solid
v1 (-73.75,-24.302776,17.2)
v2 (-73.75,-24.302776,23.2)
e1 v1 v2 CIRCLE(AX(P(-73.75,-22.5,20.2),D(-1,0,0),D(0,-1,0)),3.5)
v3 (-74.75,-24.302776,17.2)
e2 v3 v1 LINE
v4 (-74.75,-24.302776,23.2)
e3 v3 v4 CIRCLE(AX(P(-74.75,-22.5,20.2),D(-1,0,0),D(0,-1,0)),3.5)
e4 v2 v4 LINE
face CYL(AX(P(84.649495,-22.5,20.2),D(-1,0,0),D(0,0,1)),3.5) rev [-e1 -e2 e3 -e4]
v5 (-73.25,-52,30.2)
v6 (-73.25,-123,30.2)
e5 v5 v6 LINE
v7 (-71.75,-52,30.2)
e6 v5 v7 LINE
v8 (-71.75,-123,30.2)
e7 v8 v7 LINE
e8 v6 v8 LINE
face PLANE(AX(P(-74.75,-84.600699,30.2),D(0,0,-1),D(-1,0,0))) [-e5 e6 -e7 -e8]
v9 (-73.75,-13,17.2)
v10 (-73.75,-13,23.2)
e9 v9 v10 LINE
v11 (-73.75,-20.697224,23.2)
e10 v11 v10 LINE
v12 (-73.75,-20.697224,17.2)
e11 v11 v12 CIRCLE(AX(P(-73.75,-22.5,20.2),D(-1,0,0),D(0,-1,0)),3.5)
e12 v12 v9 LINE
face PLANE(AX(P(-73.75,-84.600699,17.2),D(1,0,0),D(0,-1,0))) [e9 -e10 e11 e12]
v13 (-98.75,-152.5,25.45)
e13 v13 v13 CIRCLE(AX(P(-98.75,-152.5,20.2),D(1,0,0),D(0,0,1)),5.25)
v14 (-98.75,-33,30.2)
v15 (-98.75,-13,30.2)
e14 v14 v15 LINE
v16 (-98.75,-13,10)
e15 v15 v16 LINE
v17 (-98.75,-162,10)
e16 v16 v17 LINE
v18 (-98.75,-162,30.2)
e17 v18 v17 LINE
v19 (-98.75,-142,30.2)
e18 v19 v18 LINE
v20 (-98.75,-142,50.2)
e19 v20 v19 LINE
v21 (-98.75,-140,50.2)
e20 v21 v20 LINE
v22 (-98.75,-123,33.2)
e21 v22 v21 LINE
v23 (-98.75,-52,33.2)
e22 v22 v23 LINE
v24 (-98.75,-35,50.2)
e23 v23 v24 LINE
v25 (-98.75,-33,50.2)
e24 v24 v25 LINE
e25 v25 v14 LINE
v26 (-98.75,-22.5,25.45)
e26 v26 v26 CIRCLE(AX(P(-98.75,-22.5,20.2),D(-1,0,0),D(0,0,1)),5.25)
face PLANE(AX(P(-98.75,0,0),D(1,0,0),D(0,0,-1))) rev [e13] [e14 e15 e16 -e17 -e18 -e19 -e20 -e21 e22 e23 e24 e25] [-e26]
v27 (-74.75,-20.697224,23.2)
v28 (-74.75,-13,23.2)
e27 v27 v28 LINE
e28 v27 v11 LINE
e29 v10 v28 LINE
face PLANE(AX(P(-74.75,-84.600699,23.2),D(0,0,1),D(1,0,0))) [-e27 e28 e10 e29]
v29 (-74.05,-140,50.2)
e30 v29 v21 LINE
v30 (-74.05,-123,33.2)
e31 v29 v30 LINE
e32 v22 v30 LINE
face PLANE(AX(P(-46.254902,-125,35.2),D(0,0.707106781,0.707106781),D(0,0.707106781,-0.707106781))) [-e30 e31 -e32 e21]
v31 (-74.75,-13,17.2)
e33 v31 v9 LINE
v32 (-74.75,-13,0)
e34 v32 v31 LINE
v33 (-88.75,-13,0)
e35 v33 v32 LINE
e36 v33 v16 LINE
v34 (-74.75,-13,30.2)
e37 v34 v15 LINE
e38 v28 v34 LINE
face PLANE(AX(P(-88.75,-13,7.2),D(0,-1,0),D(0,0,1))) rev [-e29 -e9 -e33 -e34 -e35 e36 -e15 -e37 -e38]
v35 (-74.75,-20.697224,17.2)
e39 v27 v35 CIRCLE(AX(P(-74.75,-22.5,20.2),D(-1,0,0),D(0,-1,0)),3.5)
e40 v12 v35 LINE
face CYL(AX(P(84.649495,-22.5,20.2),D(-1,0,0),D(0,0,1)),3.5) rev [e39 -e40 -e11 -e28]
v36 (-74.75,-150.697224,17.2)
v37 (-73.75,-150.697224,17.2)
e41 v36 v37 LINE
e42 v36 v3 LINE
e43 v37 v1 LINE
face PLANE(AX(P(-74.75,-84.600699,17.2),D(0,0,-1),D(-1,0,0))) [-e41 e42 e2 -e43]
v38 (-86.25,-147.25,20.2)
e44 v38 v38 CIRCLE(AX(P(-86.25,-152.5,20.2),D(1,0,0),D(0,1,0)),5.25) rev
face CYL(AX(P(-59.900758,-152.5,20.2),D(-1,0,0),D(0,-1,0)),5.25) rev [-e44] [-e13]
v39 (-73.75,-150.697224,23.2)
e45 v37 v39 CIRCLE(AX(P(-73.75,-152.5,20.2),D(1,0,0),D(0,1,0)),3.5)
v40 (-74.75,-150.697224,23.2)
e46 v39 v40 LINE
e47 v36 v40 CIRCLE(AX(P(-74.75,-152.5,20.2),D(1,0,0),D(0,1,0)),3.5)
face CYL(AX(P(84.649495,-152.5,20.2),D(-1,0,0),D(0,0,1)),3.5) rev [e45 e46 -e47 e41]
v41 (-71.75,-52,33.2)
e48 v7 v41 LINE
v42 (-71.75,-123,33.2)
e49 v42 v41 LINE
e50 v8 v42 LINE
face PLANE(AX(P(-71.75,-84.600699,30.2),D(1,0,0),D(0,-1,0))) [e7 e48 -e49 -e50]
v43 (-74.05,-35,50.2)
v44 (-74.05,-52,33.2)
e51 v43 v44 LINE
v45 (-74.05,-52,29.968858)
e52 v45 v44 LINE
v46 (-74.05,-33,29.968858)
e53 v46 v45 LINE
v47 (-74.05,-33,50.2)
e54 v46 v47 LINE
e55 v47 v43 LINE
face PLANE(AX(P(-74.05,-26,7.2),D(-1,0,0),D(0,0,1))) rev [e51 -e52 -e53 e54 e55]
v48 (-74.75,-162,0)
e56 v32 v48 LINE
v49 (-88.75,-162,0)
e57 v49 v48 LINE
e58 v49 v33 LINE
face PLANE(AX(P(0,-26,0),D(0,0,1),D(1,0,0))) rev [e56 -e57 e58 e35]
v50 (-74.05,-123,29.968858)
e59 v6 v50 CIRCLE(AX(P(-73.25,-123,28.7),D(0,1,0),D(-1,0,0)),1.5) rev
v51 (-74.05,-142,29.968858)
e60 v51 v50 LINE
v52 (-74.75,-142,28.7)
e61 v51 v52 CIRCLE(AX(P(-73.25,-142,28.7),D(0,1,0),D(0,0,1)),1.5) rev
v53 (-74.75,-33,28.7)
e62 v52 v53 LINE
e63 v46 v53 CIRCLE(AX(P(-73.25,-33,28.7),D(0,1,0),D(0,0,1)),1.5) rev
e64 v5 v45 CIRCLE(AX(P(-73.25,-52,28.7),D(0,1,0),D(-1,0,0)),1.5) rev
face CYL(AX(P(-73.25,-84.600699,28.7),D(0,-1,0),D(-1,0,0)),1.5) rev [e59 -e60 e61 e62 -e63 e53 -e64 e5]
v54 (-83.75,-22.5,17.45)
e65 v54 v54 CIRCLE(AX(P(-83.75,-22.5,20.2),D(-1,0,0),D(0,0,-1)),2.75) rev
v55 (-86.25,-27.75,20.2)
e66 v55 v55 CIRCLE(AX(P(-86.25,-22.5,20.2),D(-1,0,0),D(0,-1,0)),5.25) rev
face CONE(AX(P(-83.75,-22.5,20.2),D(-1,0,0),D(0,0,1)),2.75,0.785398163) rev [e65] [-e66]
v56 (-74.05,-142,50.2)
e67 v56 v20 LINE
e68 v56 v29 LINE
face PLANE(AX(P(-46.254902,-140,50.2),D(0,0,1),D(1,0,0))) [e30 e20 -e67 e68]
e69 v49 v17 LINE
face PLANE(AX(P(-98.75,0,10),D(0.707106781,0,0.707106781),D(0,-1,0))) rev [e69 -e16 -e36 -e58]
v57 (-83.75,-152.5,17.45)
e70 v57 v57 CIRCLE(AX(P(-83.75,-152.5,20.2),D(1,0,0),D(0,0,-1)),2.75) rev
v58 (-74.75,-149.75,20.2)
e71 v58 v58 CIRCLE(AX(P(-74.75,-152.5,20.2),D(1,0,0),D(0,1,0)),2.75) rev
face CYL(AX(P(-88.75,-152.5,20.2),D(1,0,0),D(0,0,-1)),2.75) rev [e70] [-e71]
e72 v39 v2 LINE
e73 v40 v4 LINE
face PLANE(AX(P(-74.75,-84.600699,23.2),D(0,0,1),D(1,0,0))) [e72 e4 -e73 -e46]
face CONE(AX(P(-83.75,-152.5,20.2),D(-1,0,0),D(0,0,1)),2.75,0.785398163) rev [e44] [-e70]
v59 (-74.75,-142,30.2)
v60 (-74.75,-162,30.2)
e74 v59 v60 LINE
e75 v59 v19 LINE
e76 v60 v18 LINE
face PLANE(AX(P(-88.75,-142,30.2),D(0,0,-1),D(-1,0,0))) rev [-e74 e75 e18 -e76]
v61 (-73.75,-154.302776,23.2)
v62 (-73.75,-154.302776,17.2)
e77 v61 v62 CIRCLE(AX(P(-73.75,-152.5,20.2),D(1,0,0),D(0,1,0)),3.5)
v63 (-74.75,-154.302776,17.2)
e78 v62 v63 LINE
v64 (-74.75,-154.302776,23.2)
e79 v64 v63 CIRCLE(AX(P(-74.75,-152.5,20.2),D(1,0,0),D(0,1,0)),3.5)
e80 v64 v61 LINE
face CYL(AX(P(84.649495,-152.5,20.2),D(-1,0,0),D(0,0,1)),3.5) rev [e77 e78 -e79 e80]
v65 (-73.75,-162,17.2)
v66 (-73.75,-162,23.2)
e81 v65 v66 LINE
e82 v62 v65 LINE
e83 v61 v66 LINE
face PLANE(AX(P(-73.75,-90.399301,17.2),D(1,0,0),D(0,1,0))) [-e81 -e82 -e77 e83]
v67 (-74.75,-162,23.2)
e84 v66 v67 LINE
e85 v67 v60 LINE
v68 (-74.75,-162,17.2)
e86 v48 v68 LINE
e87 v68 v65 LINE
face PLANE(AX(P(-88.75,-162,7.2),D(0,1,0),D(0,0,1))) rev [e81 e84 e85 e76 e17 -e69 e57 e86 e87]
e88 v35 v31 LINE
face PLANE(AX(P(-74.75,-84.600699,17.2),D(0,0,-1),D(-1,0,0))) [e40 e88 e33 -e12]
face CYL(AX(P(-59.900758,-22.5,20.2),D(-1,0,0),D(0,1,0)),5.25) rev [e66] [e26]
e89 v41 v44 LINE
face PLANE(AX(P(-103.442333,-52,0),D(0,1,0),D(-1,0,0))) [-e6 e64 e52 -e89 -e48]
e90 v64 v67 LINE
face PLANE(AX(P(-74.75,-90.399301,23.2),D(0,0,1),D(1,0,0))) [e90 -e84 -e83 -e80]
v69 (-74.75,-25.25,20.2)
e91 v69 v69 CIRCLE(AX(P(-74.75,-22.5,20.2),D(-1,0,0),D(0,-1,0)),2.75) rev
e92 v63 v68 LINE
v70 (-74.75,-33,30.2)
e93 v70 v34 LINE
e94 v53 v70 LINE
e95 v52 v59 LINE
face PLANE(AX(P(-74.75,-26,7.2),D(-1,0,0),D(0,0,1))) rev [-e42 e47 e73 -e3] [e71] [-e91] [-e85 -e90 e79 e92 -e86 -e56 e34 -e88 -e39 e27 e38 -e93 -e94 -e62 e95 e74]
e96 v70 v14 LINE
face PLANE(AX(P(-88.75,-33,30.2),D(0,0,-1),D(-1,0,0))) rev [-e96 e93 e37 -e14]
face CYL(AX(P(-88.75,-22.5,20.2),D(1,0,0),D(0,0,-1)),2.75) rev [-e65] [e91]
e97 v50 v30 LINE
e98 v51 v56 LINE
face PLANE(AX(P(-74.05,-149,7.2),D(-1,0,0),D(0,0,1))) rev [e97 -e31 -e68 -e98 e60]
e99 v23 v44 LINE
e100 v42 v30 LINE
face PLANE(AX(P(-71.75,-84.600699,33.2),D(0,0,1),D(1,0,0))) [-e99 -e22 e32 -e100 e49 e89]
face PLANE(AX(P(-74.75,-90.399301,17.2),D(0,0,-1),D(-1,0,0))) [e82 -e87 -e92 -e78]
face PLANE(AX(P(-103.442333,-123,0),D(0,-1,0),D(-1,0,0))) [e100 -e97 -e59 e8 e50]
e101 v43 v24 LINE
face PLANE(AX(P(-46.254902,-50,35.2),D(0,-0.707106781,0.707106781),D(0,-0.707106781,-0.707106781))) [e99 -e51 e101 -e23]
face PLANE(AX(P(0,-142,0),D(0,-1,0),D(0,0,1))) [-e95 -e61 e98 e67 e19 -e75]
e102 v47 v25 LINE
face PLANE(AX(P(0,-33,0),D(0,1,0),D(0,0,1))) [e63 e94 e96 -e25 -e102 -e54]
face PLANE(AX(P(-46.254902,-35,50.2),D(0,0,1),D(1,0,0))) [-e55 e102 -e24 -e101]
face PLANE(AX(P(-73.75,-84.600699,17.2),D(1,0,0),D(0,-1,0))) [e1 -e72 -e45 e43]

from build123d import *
from build123d.topology import SkipClean

# Parameters (mm, degrees)
BOSS_EXTRUDE1_DEPTH            = 7.2
SKETCH2_R                      = 1.1
CUT_EXTRUDE1_DEPTH             = 99.880748885
SKETCH3_R                      = 2.25
CUT_EXTRUDE2_DEPTH             = 5.5
BOSS_EXTRUDE2_DEPTH            = 3
FILLET1_R                      = 11
BOSS_EXTRUDE3_DEPTH            = 43
BOSS_EXTRUDE4_DEPTH            = 30
FILLET2_R                      = 1.5
SKETCH7_R                      = 2.75
CUT_EXTRUDE3_DEPTH             = 179.693144804
SKETCH8_R                      = 5.25
CUT_EXTRUDE4_DEPTH             = 5
CUT_EXTRUDE6_START             = -2.5
SKETCH10_R                     = 5.25
CUT_EXTRUDE6_DEPTH             = 2.5
CHAMFER1_SIZE                  = 2.5
CUT_EXTRUDE5_REACH             = 170.548
SKETCH9_R                      = 3.5
CUT_EXTRUDE5_DIRECTION_2_REACH = 170.548
CUT_EXTRUDE7_DEPTH             = 105.056727317
CUT_EXTRUDE8_DEPTH             = 20
BOSS_EXTRUDE6_DEPTH            = 17
SKETCH15_R                     = 5.25
BOSS_EXTRUDE7_DEPTH            = 10
CHAMFER3_SIZE                  = 10
BOSS_EXTRUDE5_DEPTH            = 17.55
SKETCH16_W                     = 1.5
SKETCH16_H                     = 19
CUT_EXTRUDE9_DEPTH             = 2.3
BOSS_EXTRUDE8_DEPTH            = 4
BOSS_EXTRUDE9_DEPTH            = 31.5


with BuildPart() as part:
    # Sketch1 → Boss-Extrude1 (new body)
    with BuildSketch(Plane.XY):
        Polygon((74.75, 0), (-74.75, 0), (-74.75, 30), (-88.75, 30), (-88.75, -13), (84.25, -13), (84.25, 17), (74.75, 17), align=None)
    extrude(amount=BOSS_EXTRUDE1_DEPTH)

    # Sketch2 → Cut-Extrude1 (cut, through all)
    with BuildSketch(Plane.XZ.offset(13)):
        with Locations(Location((-56.25, 4.5, 0), (0, 0, 270))):
            Circle(SKETCH2_R)
        with Locations(Location((37.75, 4.5, 0), (0, 0, 270))):
            Circle(SKETCH2_R)
    extrude(amount=-CUT_EXTRUDE1_DEPTH, mode=Mode.SUBTRACT)

    # Sketch3 → Cut-Extrude2 (cut)
    with BuildSketch(Plane.XZ.offset(13)):
        with Locations(Location((-56.25, 4.5, 0), (0, 0, 270))):
            Circle(SKETCH3_R)
        with Locations(Location((37.75, 4.5, 0), (0, 0, 270))):
            Circle(SKETCH3_R)
    extrude(amount=-CUT_EXTRUDE2_DEPTH, mode=Mode.SUBTRACT)

    # Sketch4 → Boss-Extrude2 (add)
    with BuildSketch(Plane.XY.offset(7.2)):
        Polygon((-88.75, -13), (84.25, -13), (84.25, 2.989373151), (84.25, 17), (74.75, 17), (74.75, 6), (-74.75, 6), (-74.75, 30), (-88.75, 30), align=None)
    extrude(amount=BOSS_EXTRUDE2_DEPTH)

    # Fillet1
    fillet1_edges = [part.edges().sort_by_distance(p)[0] for p in [
        (74.75, 6, 8.7),
        (-74.75, 6, 8.7),
    ]]
    fillet(fillet1_edges, radius=FILLET1_R - 0.0001)  # a hair under: the kernel refuses the full size

    # Sketch5 → Boss-Extrude3 (add)
    with BuildSketch(Plane.XZ.offset(13)):
        Polygon((-74.75, 30.2), (-71.75, 30.2), (-71.75, 33.2), (-88.75, 33.2), (-88.75, 10.2), (-74.75, 10.2), (-74.75, 17.2), (-73.75, 17.2), (-73.75, 23.2), (-74.75, 23.2), align=None)
    extrude(amount=-BOSS_EXTRUDE3_DEPTH)

    # Sketch6 → Boss-Extrude4 (add)
    with BuildSketch(Plane.XZ.offset(13)):
        Polygon((74.75, 10.2), (74.75, 17.2), (73.75, 17.2), (73.75, 23.2), (74.75, 23.2), (74.75, 30.2), (71.75, 30.2), (71.75, 33.2), (84.25, 33.2), (84.25, 10.2), align=None)
    extrude(amount=-BOSS_EXTRUDE4_DEPTH)

    # Fillet2
    fillet2_edges = [part.edges().sort_by_distance(p)[0] for p in [
        (74.75, 1.99995, 10.2),
        (74.75, 2, 30.2),
        (-74.75, 1.99995, 10.2),
        (-74.75, 8.5, 30.2),
    ]]
    fillet(fillet2_edges, radius=FILLET2_R)

    # Sketch7 → Cut-Extrude3 (cut, through all)
    with BuildSketch(Plane(origin=(84.25, 0, 0), x_dir=(0, 0, -1), z_dir=(1, 0, 0))):
        with Locations((-20.2, -3.5)):
            Circle(SKETCH7_R)
    extrude(amount=-CUT_EXTRUDE3_DEPTH, mode=Mode.SUBTRACT)

    # Sketch8 → Cut-Extrude4 (cut)
    with BuildSketch(Plane(origin=(84.25, 0, 0), x_dir=(0, 0, -1), z_dir=(1, 0, 0))):
        with Locations((-20.2, -3.5)):
            Circle(SKETCH8_R)
    extrude(amount=-CUT_EXTRUDE4_DEPTH, mode=Mode.SUBTRACT)

    # Sketch10 → Cut-Extrude6 (cut)
    with BuildSketch(Plane.ZY.offset(88.75).offset(CUT_EXTRUDE6_START)):
        with Locations(Location((20.2, -3.5, 0), (0, 0, 180))):
            Circle(SKETCH10_R)
    extrude(amount=CUT_EXTRUDE6_DEPTH, mode=Mode.SUBTRACT)

    # Chamfer1
    chamfer1_edges = [part.edges().sort_by_distance(p)[0] for p in [
        (79.25, -3.5, 22.95),
        (-86.25, -3.5, 22.95),
    ]]
    chamfer(chamfer1_edges, length=CHAMFER1_SIZE - 0.0001)  # a hair under: the kernel refuses the full size

    # Cut-Extrude5: up to this face of the body (flat: up to its plane)
    cut_extrude5_end = Plane(part.part.faces().sort_by_distance((74.75, 2, 25.95))[0])
    # Sketch9 → Cut-Extrude5 (cut, up to the picked face)
    with BuildSketch(Plane.ZY.offset(-73.75), mode=Mode.PRIVATE) as cut_extrude5_sk1:
        with Locations((20.2, -3.5)):
            Circle(SKETCH9_R)
    cut_extrude5_tool1 = split(extrude(cut_extrude5_sk1.sketch, amount=-CUT_EXTRUDE5_REACH, mode=Mode.PRIVATE), bisect_by=cut_extrude5_end, keep=Keep.BOTH, mode=Mode.PRIVATE)
    add(cut_extrude5_tool1.solids().sort_by(Axis((73.75, -3.5, 20.2), (1, 0, 0)))[0], mode=Mode.SUBTRACT)

    # Cut-Extrude5 direction 2: up to this face of the body (flat: up to its plane)
    cut_extrude5_direction_2_end = Plane(part.part.faces().sort_by_distance((-74.75, 8.5, 25.95))[0])
    # Sketch9 → Cut-Extrude5 direction 2 (cut, up to the picked face)
    with BuildSketch(Plane.ZY.offset(-73.75), mode=Mode.PRIVATE) as cut_extrude5_direction_2_sk1:
        with Locations((20.2, -3.5)):
            Circle(SKETCH9_R)
    cut_extrude5_direction_2_tool1 = split(extrude(cut_extrude5_direction_2_sk1.sketch, amount=CUT_EXTRUDE5_DIRECTION_2_REACH, mode=Mode.PRIVATE), bisect_by=cut_extrude5_direction_2_end, keep=Keep.BOTH, mode=Mode.PRIVATE)
    add(cut_extrude5_direction_2_tool1.solids().sort_by(Axis((73.75, -3.5, 20.2), (-1, 0, 0)))[0], mode=Mode.SUBTRACT)


with BuildPart() as body_2:
    # Mirror1: mirrored copy
    add(part.part.mirror(Plane(origin=(-88.75, -13, 7.2), x_dir=(0, 0, 1), z_dir=(0, 1, 0))))

    # Sketch11 → Cut-Extrude7 (cut, through all)
    with BuildSketch(Plane(origin=(0, -13, 0), x_dir=(1, 0, 0), z_dir=(0, 1, 0))):
        Polygon((71.75, -33.2), (71.75, -17.2), (-74.75, -17.2), (-74.75, 0), (71.75, 0), (84.25, 0), (84.25, -33.2), align=None)
    extrude(amount=-CUT_EXTRUDE7_DEPTH, mode=Mode.SUBTRACT)

    # Sketch13 → Cut-Extrude8 (cut)
    with BuildSketch(Plane(origin=(0, -13, 0), x_dir=(1, 0, 0), z_dir=(0, 1, 0))):
        Polygon((-88.75, -30.2), (-74.75, -30.2), (-74.75, -28.7), (-71.75, -28.7), (-71.75, -30.2), (-71.75, -33.2), (-88.75, -33.2), align=None)
    extrude(amount=-CUT_EXTRUDE8_DEPTH, mode=Mode.SUBTRACT)

    # Sketch14 → Boss-Extrude6 (add)
    with BuildSketch(Plane.ZY.offset(88.75)):
        Polygon((33.2, -33), (50.2, -33), (50.2, -35), (35.2, -50), (33.2, -52), (33.2, -50), align=None)
    extrude(amount=-BOSS_EXTRUDE6_DEPTH)

    # Sketch15 → Boss-Extrude7 (add)
    with SkipClean():  # the faces are left unmerged after this step: merging them gives an invalid solid
        with BuildSketch(Plane.ZY.offset(88.75)):
            Polygon((33.2, -52), (0, -52), (0, -13), (30.2, -13), (30.2, -33), (50.2, -33), (50.2, -35), align=None)
            with Locations((20.2, -22.5)):
                Circle(SKETCH15_R, mode=Mode.SUBTRACT)
        extrude(amount=BOSS_EXTRUDE7_DEPTH)
    add(body_2.part.scale(1), mode=Mode.REPLACE)  # the faces are merged on a copy

    # Chamfer3
    chamfer3_edges = [body_2.edges().sort_by_distance(p)[0] for p in [
        (-98.75, -32.5, 0),
    ]]
    chamfer(chamfer3_edges, length=CHAMFER3_SIZE)

    # Sketch12 → Boss-Extrude5 (add)
    with SkipClean():  # the faces are left unmerged after this step: merging them gives an invalid solid
        with BuildSketch(Plane.XZ.offset(56)):
            with BuildLine():
                Line((-88.75, 0), (-74.75, 0))
                Line((-74.75, 0), (-74.75, 17.2))
                Line((-74.75, 17.2), (-73.75, 17.2))
                Line((-73.75, 17.2), (-73.75, 23.2))
                Line((-73.75, 23.2), (-74.75, 23.2))
                Line((-74.75, 23.2), (-74.75, 28.7))
                ThreePointArc((-74.75, 28.7), (-74.310660172, 29.760660172), (-73.25, 30.2))
                Line((-73.25, 30.2), (-71.75, 30.2))
                Line((-71.75, 30.2), (-71.75, 33.2))
                Line((-71.75, 33.2), (-88.75, 33.2))
                Line((-88.75, 33.2), (-88.75, 0))
            make_face()
        extrude(amount=-BOSS_EXTRUDE5_DEPTH)

    # Sketch16 → Cut-Extrude9 (cut)
    with SkipClean():  # the faces are left unmerged after this step: merging them gives an invalid solid
        with BuildSketch(Plane(origin=(-71.75, 0, 0), x_dir=(0, 0, -1), z_dir=(1, 0, 0))):
            Polygon((-33.2, -52), (-30.2, -52), (-30.2, -33), (-50.2, -33), (-50.2, -35), align=None)
            with Locations((-29.45, -42.5)):
                Rectangle(SKETCH16_W, SKETCH16_H)
        extrude(amount=-CUT_EXTRUDE9_DEPTH, mode=Mode.SUBTRACT)

    # Sketch18 → Boss-Extrude8 (add)
    with SkipClean():  # the faces are left unmerged after this step: merging them gives an invalid solid
        with BuildSketch(Plane.XZ.offset(52)):
            Polygon((-98.75, 33.2), (-98.75, 10), (-88.75, 0), (-88.75, 33.2), align=None)
        extrude(amount=BOSS_EXTRUDE8_DEPTH)

    # Sketch19 → Boss-Extrude9 (add)
    with SkipClean():  # the faces are left unmerged after this step: merging them gives an invalid solid
        with BuildSketch(Plane.XZ.offset(56)):
            with BuildLine():
                Line((-88.75, 0), (-74.75, 0))
                Line((-74.75, 0), (-74.75, 17.2))
                Line((-74.75, 17.2), (-73.75, 17.2))
                Line((-73.75, 17.2), (-73.75, 23.2))
                Line((-73.75, 23.2), (-74.75, 23.2))
                Line((-74.75, 23.2), (-74.75, 28.7))
                ThreePointArc((-74.75, 28.7), (-74.310660172, 29.760660172), (-73.25, 30.2))
                Line((-73.25, 30.2), (-71.75, 30.2))
                Line((-71.75, 30.2), (-71.75, 33.2))
                Line((-71.75, 33.2), (-98.75, 33.2))
                Line((-98.75, 33.2), (-98.75, 10))
                Line((-98.75, 10), (-88.75, 0))
            make_face()
        extrude(amount=BOSS_EXTRUDE9_DEPTH)

    # Mirror2: body 2 across plane


with BuildPart() as body_2_1:
    with SkipClean():  # the faces are left unmerged after this step: merging them gives an invalid solid
        add(body_2.part)
        add(body_2.part.mirror(Plane.ZX.offset(-87.5)))


solid = body_2_1.part
